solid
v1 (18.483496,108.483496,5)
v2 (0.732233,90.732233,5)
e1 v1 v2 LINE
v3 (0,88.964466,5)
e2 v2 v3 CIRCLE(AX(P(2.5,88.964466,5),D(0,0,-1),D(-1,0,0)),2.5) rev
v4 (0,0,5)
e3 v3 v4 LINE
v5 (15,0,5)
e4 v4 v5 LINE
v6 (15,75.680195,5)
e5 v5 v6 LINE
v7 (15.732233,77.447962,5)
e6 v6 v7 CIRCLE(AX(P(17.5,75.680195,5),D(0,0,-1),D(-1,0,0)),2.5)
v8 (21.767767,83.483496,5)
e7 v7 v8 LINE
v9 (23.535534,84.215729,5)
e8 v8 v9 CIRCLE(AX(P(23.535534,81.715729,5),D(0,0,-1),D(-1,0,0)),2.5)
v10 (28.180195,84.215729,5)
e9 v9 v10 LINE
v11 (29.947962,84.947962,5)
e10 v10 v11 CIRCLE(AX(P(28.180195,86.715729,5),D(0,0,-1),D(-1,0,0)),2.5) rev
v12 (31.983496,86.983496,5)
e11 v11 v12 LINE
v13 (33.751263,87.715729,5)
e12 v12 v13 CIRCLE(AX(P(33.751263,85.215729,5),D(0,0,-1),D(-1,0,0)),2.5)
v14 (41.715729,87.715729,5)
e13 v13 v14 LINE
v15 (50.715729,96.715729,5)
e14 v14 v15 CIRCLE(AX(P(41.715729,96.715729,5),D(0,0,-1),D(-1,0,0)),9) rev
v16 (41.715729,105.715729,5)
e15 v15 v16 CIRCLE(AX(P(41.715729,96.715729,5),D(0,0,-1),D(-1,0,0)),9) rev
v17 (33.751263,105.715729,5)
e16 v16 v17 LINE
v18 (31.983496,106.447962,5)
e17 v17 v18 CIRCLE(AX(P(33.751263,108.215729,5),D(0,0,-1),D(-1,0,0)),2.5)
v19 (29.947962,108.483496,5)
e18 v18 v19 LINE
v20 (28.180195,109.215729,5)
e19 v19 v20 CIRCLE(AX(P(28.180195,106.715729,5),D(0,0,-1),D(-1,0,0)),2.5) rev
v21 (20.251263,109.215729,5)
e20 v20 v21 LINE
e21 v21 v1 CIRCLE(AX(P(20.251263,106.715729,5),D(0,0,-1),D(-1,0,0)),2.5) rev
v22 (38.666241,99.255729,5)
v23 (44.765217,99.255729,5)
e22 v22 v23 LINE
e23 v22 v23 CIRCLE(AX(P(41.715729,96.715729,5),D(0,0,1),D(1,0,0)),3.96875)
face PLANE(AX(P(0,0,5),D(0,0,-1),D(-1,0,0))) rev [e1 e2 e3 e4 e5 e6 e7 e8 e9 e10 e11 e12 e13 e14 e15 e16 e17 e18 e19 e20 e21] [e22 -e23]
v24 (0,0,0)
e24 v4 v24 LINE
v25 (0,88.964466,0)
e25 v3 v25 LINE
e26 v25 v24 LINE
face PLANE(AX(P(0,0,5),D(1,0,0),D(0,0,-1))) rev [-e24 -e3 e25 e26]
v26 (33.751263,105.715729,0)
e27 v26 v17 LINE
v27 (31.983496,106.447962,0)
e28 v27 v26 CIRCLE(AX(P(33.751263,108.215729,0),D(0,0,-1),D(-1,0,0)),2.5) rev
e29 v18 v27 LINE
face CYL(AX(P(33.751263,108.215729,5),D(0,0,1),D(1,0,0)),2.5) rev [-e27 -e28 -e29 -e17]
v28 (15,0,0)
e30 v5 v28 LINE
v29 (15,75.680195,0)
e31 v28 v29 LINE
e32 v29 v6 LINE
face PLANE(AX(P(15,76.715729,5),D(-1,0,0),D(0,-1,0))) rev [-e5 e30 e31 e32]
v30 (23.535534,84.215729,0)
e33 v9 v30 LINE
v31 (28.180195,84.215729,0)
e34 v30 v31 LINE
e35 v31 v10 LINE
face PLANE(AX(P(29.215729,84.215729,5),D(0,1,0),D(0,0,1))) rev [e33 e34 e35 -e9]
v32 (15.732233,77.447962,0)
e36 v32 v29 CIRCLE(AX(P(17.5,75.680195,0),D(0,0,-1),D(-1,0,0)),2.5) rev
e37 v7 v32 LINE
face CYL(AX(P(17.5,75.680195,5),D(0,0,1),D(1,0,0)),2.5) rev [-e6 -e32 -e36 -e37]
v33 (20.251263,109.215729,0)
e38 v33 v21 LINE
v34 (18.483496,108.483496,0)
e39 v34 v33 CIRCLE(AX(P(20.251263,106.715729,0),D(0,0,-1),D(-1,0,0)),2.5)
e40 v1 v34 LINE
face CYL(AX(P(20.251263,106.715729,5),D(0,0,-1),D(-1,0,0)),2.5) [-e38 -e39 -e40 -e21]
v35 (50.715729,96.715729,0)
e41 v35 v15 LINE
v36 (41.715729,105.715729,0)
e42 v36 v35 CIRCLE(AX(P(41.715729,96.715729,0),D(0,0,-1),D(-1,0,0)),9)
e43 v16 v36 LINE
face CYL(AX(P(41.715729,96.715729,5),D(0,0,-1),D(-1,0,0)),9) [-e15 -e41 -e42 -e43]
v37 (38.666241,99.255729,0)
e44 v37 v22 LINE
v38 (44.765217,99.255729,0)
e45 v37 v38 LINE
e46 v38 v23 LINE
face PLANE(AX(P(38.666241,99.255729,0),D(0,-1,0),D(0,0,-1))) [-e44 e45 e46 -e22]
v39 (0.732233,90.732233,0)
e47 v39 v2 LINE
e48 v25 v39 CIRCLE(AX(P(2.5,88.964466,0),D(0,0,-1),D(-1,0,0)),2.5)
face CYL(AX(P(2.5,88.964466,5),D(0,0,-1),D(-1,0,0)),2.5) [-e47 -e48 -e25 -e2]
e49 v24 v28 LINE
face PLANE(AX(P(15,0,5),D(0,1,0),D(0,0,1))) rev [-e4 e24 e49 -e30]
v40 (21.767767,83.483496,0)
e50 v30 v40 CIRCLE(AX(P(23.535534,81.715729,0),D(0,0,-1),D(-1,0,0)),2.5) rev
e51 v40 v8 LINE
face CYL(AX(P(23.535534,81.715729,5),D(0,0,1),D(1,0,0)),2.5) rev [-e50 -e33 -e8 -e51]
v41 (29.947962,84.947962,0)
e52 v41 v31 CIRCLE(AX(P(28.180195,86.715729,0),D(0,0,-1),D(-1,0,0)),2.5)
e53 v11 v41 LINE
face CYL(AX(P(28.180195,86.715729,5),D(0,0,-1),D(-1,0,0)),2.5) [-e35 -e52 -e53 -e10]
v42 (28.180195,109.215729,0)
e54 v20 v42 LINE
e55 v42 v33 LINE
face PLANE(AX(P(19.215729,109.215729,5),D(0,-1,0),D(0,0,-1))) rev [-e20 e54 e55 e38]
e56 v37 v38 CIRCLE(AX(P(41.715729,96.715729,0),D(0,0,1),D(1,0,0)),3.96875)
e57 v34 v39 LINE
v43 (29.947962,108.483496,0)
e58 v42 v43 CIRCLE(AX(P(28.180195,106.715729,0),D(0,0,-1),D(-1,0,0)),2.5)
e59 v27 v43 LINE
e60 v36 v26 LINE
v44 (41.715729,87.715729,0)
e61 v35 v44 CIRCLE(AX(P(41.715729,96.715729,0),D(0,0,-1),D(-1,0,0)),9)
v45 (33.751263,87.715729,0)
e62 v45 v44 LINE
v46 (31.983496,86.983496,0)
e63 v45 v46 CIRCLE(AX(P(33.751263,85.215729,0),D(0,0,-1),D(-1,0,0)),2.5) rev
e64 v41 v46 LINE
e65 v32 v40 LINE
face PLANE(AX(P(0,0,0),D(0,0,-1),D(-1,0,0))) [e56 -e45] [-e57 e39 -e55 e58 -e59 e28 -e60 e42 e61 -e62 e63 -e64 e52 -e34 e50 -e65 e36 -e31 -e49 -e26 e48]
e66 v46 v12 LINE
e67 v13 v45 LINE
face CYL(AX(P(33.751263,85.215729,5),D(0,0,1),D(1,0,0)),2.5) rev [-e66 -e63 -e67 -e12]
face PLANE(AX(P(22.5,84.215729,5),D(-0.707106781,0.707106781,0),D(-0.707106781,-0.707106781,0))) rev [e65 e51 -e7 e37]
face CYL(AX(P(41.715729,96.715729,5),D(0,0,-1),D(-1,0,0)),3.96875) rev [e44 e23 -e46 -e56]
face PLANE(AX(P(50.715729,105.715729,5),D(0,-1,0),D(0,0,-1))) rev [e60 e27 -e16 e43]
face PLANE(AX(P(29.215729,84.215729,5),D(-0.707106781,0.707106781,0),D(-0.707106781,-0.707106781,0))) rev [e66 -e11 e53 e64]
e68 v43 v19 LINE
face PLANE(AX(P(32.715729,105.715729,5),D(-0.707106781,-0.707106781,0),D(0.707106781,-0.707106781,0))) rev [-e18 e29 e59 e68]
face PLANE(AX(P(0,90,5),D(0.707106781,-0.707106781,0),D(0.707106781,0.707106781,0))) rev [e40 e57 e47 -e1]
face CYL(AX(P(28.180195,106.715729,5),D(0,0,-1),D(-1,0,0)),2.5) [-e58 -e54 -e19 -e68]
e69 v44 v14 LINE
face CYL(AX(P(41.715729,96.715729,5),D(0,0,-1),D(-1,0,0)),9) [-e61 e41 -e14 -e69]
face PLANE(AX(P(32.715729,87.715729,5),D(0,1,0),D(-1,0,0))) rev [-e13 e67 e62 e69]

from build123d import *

# Parameters (mm, degrees)
ESQUISSE2_R        = 3.96875
BOSS_EXTRU_6_DEPTH = 5
BOSS_EXTRU_7_DEPTH = 5
CONG_1_R           = 9
CONG_2_R           = 2.5


with BuildPart() as part:
    # Esquisse2 → Boss.-Extru.6 (new body)
    with BuildSketch(Plane.XY):
        Polygon((0, 0), (0, 90), (19.215728753, 109.215728753), (29.215728753, 109.215728753), (32.715728753, 105.715728753), (50.715728753, 105.715728753), (50.715728753, 87.715728753), (32.715728753, 87.715728753), (29.215728753, 84.215728753), (22.5, 84.215728753), (15, 76.715728753), (15, 0), align=None)
        with Locations((41.715728753, 96.715728753)):
            Circle(ESQUISSE2_R, mode=Mode.SUBTRACT)
    extrude(amount=BOSS_EXTRU_6_DEPTH)

    # Esquisse3 → Boss.-Extru.7 (add, through all)
    with BuildSketch(Plane.XY.offset(5)):
        with BuildLine():
            Line((38.666240834, 99.255728753), (44.765216671, 99.255728753))
            ThreePointArc((44.765216671, 99.255728753), (41.715728753, 100.684478753), (38.666240834, 99.255728753))
        make_face()
    extrude(amount=-BOSS_EXTRU_7_DEPTH)

    # Congé1
    cong_1_edges = [part.edges().sort_by_distance(p)[0] for p in [
        (50.715728753, 87.715728753, 2.5),
        (50.715728753, 105.715728753, 2.5),
    ]]
    fillet(cong_1_edges, radius=CONG_1_R - 0.0001)  # a hair under: the kernel refuses the full size

    # Congé2
    cong_2_edges = [part.edges().sort_by_distance(p)[0] for p in [
        (0, 90, 2.5),
        (19.215728753, 109.215728753, 2.5),
        (29.215728753, 109.215728753, 2.5),
        (32.715728753, 105.715728753, 2.5),
        (32.715728753, 87.715728753, 2.5),
        (29.215728753, 84.215728753, 2.5),
        (22.5, 84.215728753, 2.5),
        (15, 76.715728753, 2.5),
    ]]
    fillet(cong_2_edges, radius=CONG_2_R)


solid = part.part
